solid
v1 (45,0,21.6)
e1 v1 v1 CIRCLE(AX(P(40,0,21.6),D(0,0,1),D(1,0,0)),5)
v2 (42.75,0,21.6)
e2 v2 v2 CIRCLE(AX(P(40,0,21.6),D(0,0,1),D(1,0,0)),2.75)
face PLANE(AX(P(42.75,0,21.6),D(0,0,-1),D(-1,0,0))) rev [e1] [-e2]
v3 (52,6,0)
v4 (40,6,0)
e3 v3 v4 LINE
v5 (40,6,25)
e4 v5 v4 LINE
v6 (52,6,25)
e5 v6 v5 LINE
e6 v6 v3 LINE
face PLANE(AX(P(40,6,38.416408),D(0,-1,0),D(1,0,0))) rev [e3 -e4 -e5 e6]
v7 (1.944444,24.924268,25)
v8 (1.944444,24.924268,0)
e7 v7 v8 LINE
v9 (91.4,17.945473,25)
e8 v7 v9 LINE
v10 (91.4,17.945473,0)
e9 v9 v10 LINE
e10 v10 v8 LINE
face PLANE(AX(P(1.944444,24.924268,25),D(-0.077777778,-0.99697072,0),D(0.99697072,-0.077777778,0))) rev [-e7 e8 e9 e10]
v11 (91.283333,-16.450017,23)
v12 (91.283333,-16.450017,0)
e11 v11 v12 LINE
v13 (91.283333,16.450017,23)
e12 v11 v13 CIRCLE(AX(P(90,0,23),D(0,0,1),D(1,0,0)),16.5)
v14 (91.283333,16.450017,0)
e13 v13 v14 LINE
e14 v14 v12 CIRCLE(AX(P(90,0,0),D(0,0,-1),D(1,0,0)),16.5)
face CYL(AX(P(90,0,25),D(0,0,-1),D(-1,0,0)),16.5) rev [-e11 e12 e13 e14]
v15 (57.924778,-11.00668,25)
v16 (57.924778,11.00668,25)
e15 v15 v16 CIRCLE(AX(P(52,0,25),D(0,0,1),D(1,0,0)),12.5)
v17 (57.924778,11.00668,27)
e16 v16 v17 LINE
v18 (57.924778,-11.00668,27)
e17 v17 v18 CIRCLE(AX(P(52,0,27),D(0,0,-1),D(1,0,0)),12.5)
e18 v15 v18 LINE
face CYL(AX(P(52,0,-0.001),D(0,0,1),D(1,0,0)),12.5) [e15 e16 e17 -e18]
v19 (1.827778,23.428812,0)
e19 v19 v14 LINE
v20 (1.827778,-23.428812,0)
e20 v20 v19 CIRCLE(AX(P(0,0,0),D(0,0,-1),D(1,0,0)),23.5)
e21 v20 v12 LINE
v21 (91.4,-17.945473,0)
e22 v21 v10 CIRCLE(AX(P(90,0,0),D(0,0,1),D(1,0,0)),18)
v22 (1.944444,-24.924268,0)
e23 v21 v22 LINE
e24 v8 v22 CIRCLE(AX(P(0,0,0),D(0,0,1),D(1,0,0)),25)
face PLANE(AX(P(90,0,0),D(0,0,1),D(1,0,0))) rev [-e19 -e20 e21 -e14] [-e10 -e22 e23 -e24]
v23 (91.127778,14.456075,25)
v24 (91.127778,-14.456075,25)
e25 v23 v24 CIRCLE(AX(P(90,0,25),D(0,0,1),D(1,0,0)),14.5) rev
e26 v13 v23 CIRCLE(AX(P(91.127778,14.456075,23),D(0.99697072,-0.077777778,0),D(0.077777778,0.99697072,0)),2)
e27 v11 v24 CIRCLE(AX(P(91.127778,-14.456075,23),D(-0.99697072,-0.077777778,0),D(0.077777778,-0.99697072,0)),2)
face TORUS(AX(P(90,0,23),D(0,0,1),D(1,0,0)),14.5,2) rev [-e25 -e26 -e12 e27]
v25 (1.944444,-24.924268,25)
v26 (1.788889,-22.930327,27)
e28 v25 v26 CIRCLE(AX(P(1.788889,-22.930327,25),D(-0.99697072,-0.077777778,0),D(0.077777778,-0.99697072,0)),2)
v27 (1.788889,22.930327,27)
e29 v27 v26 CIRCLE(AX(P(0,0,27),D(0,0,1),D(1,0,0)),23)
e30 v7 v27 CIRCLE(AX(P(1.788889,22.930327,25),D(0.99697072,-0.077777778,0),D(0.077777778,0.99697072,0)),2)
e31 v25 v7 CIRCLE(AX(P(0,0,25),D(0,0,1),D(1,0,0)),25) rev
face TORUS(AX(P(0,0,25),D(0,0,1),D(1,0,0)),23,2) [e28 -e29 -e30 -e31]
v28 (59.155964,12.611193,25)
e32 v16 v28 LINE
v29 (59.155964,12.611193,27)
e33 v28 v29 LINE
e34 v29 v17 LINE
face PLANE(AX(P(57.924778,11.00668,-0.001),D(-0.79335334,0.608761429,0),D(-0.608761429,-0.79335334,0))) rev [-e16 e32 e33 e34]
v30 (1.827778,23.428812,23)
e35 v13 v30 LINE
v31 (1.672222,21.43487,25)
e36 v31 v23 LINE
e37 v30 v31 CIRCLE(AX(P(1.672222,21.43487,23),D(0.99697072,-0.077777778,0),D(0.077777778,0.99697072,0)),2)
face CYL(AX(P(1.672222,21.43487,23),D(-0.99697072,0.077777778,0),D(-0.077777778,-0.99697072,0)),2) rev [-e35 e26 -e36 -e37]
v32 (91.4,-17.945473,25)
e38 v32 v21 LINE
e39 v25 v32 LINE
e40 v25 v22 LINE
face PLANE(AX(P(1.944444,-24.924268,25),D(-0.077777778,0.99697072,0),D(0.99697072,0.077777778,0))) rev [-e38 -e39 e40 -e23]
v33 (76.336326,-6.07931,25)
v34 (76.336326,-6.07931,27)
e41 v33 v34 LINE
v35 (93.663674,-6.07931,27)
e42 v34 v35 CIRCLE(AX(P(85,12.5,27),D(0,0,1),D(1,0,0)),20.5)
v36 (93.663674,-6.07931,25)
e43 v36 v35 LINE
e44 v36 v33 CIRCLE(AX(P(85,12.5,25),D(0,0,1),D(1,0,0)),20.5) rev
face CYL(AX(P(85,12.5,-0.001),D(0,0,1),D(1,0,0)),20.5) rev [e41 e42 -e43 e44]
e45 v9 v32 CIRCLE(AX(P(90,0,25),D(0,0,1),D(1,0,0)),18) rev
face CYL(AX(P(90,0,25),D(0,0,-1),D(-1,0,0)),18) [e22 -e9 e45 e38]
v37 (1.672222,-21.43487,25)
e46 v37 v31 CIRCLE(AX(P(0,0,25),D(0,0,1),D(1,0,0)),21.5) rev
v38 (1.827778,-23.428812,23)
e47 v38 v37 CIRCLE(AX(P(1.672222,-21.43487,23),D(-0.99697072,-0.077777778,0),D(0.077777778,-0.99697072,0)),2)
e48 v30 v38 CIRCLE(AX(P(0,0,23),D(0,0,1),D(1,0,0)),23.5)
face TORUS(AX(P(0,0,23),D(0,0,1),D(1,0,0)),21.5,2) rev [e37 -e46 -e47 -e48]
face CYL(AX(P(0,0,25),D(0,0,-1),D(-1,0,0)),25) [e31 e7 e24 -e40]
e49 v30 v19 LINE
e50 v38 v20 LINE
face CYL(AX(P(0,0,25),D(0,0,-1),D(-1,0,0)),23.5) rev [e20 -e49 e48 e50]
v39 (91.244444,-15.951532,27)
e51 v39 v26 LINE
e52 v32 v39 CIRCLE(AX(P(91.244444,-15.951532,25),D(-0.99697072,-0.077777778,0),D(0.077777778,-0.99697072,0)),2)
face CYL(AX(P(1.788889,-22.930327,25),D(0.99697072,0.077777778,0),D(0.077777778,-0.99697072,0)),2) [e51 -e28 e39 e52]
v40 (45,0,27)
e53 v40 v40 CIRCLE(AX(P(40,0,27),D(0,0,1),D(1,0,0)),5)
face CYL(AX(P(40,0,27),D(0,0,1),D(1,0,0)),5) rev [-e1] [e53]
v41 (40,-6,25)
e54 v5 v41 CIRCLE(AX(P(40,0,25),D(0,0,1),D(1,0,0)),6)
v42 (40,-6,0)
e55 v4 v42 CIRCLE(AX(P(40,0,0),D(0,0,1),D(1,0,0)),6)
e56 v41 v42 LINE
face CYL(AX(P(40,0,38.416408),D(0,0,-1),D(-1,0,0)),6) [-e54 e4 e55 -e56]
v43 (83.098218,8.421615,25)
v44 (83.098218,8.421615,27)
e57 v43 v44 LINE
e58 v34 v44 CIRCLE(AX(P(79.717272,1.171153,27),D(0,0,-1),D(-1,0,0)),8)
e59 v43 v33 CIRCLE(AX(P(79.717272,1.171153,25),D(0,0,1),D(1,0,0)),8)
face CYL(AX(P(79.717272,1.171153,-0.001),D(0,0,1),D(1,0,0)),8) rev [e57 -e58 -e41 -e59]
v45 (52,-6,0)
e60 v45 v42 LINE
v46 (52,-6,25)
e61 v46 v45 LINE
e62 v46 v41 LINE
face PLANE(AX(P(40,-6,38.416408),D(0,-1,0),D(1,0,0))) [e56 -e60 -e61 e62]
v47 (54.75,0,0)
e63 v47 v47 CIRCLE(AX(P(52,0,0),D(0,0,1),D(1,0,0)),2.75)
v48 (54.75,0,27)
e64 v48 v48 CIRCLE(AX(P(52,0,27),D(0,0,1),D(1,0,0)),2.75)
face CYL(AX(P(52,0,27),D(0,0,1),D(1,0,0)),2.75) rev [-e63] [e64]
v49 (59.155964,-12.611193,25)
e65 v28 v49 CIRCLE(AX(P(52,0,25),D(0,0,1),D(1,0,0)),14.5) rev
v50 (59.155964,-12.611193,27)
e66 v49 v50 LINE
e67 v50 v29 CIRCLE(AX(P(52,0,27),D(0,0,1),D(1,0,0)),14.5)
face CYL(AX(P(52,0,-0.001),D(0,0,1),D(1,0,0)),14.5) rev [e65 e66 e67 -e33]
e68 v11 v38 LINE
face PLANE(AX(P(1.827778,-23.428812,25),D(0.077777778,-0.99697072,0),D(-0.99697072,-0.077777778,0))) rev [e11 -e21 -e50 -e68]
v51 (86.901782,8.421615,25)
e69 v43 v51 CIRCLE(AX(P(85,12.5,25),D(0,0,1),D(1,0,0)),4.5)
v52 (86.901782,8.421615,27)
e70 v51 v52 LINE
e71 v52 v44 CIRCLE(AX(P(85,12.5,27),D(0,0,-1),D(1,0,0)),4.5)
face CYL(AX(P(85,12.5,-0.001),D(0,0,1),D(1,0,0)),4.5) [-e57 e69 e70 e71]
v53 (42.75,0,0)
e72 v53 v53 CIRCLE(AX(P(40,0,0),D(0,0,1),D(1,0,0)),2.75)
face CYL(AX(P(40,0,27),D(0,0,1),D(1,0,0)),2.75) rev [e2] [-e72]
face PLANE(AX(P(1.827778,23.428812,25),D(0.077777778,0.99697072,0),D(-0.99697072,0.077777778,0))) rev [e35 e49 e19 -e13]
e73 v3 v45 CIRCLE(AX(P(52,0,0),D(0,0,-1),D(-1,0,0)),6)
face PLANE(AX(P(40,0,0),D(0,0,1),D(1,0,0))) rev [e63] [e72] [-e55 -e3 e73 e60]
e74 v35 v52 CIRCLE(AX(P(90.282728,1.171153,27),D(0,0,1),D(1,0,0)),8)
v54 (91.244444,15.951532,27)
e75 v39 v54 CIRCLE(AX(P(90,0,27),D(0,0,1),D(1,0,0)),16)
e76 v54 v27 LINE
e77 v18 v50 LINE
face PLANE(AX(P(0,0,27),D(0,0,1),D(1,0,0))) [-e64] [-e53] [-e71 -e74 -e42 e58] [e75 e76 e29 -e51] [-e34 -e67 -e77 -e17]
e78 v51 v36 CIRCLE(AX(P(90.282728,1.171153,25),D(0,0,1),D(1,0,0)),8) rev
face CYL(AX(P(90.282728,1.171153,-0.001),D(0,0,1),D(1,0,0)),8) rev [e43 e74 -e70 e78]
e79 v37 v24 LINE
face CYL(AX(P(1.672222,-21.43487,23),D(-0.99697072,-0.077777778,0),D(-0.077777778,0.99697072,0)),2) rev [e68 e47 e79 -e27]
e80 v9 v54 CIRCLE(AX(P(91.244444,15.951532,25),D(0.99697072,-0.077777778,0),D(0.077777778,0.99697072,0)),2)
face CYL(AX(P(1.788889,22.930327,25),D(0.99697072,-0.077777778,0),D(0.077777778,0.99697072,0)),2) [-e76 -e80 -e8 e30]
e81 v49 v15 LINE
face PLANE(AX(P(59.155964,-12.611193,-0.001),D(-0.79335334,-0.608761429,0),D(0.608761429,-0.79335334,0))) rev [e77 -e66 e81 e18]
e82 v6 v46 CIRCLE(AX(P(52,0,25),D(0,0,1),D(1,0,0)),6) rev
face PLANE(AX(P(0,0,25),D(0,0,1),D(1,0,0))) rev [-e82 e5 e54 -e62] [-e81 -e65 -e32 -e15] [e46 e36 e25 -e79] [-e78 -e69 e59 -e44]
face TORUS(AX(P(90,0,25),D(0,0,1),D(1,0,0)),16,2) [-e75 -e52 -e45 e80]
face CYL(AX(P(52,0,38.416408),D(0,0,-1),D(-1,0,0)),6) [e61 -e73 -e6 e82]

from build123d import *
from build123d.topology import SkipClean

# Parameters (mm, degrees)
AUFSATZ_LINEAR_AUSTRAGEN1_DEPTH                      = 25
AUFSATZ_LINEAR_AUSTRAGEN2_DEPTH                      = 2
VERRUNDUNG1_R                                        = 2
SCHNITT_LINEAR_AUSTRAGEN1_REACH                      = 116.096
AUFSATZ_LINEAR_AUSTRAGEN3_DEPTH                      = 25
SPIEGELN2_DEPTH                                      = 25
STIRNSENKUNG_F_R_M5_ZYLINDERSCHRAUBE_MIT_D           = 5.5
STIRNSENKUNG_F_R_M5_ZYLINDERSCHRAUBE_MIT_CBORE_D     = 10
STIRNSENKUNG_F_R_M5_ZYLINDERSCHRAUBE_MIT_CBORE_DEPTH = 5.4
DURCHGANGSLOCH_F_R_M51_D                             = 5.5
SCHNITT_LINEAR_AUSTRAGEN2_REACH                      = 116.096


# Read off the part's stored shape, not the designer's step: Spiegeln2
with BuildPart() as part:
    # Skizze1 → Aufsatz-Linear austragen1 (new body)
    with BuildSketch(Plane.XY):
        with BuildLine():
            Line((1.944444444, 24.924268009), (91.4, 17.945472967))
            ThreePointArc((91.4, 17.945472967), (103.213629327, 12.222929272), (108, 0))
            Line((108, 0), (106.5, 0))
            ThreePointArc((106.5, 0), (102.11249355, 11.204351833), (91.283333333, 16.450016886))
            Line((91.283333333, 16.450016886), (1.827777778, 23.428811929))
            ThreePointArc((1.827777778, 23.428811929), (-15.957713217, 17.251127177), (-23.5, 0))
            Line((-23.5, 0), (-25, 0))
            ThreePointArc((-25, 0), (-16.976290656, 18.352262955), (1.944444444, 24.924268009))
        make_face()
    extrude(amount=AUFSATZ_LINEAR_AUSTRAGEN1_DEPTH)

    # Skizze2 → Aufsatz-Linear austragen2 (add)
    with BuildSketch(Plane.XY.offset(25)):
        with BuildLine():
            Line((108, 0), (-25, 0))
            ThreePointArc((-25, 0), (-16.976290656, 18.352262955), (1.944444444, 24.924268009))
            Line((1.944444444, 24.924268009), (91.4, 17.945472967))
            ThreePointArc((91.4, 17.945472967), (103.213629327, 12.222929272), (108, 0))
        make_face()
    extrude(amount=AUFSATZ_LINEAR_AUSTRAGEN2_DEPTH)

    # Verrundung1
    verrundung1_edges = [part.edges().sort_by_distance(p)[0] for p in [
        (-15.957713217, 17.251127177, 25),
        (46.555555556, 19.939414407, 25),
        (-16.976290656, 18.352262955, 27),
        (102.11249355, 11.204351833, 25),
        (103.213629327, 12.222929272, 27),
        (46.672222222, 21.434870488, 27),
    ]]
    fillet(verrundung1_edges, radius=VERRUNDUNG1_R)

    # Spiegeln1: part across plane


with BuildPart() as part_1:
    with SkipClean():  # the faces are left unmerged after this step: merging them gives an invalid solid
        add(part.part)
        add(part.part.mirror(Plane.ZX))

    # Skizze11 → Schnitt-Linear austragen1 (cut, up to next)
    with BuildSketch(Plane.XY.offset(27), mode=Mode.PRIVATE) as schnitt_linear_austragen1_sk1:
        with BuildLine():
            Line((85, 0), (85, 8))
            ThreePointArc((85, 8), (85.973978263, 8.106667968), (86.901782178, 8.421614958))
            ThreePointArc((86.901782178, 8.421614958), (97.533190568, 4.552098756), (93.663674366, -6.079309634))
            ThreePointArc((93.663674366, -6.079309634), (89.437012086, -7.514068146), (85, -8))
            Line((85, -8), (85, 0))
        make_face()
    schnitt_linear_austragen1_tool1 = extrude(schnitt_linear_austragen1_sk1.sketch, amount=-SCHNITT_LINEAR_AUSTRAGEN1_REACH, mode=Mode.PRIVATE) & part_1.part
    schnitt_linear_austragen1 = schnitt_linear_austragen1_tool1.solids().sort_by_distance((90.892741, 0.809501, 27))[0]
    add(schnitt_linear_austragen1, mode=Mode.SUBTRACT)

    # Spiegeln3: Schnitt-Linear austragen1 across plane
    with SkipClean():  # the faces are left unmerged after this step: merging them gives an invalid solid
        add(schnitt_linear_austragen1.mirror(Plane(origin=(85, 0, -0.001), x_dir=(0, 0, 1), z_dir=(-1, 0, 0))), mode=Mode.SUBTRACT)

    # Skizze3 → Aufsatz-Linear austragen3 (add)
    with SkipClean():  # the faces are left unmerged after this step: merging them gives an invalid solid
        with BuildSketch(Plane.XY):
            with BuildLine():
                Line((46, 6), (46, 0))
                Line((46, 0), (34, 0))
                ThreePointArc((34, 0), (35.757359313, 4.242640687), (40, 6))
                Line((40, 6), (46, 6))
            make_face()
        extrude(amount=AUFSATZ_LINEAR_AUSTRAGEN3_DEPTH)

    # Spiegeln2 outline → Spiegeln2 (add)
    with SkipClean():  # the faces are left unmerged after this step: merging them gives an invalid solid
        with BuildSketch(Plane.XY):
            with BuildLine():
                Line((52, 6), (46, 6))
                Line((46, 6), (46, 0))
                Line((46, 0), (34, 0))
                ThreePointArc((34, 0), (35.757359313, -4.242640687), (40, -6))
                Line((40, -6), (52, -6))
                ThreePointArc((52, -6), (58, 0), (52, 6))
            make_face()
        extrude(amount=SPIEGELN2_DEPTH)

    # Stirnsenkung für M5 Zylinderschraube mit Innensechskant2 (through all)
    with Locations(Plane.XY.offset(27)):
        with Locations((40, 0)):
            CounterBoreHole(STIRNSENKUNG_F_R_M5_ZYLINDERSCHRAUBE_MIT_D / 2, STIRNSENKUNG_F_R_M5_ZYLINDERSCHRAUBE_MIT_CBORE_D / 2, STIRNSENKUNG_F_R_M5_ZYLINDERSCHRAUBE_MIT_CBORE_DEPTH)

    # Durchgangsloch für M51 (through all)
    with Locations(Plane.XY.offset(27)):
        with Locations((52, 0)):
            Hole(DURCHGANGSLOCH_F_R_M51_D / 2)

    # Skizze12 → Schnitt-Linear austragen2 (cut, up to next)
    with BuildSketch(Plane.XY.offset(27), mode=Mode.PRIVATE) as schnitt_linear_austragen2_sk1:
        with BuildLine():
            Line((59.155963734, -12.611192768), (57.924777873, -11.006680115))
            ThreePointArc((57.924777873, -11.006680115), (64.5, 0), (57.924777873, 11.006680115))
            Line((57.924777873, 11.006680115), (59.155963734, 12.611192768))
            ThreePointArc((59.155963734, 12.611192768), (60.01066697, 12.086323457), (60.827040721, 11.503623434))
            ThreePointArc((60.827040721, 11.503623434), (66.5, 0), (60.827040721, -11.503623434))
            ThreePointArc((60.827040721, -11.503623434), (60.01066697, -12.086323457), (59.155963734, -12.611192768))
        make_face()
    schnitt_linear_austragen2_tool1 = extrude(schnitt_linear_austragen2_sk1.sketch, amount=-SCHNITT_LINEAR_AUSTRAGEN2_REACH, mode=Mode.PRIVATE) & part_1.part
    add(schnitt_linear_austragen2_tool1.solids().sort_by_distance((58.751722, -11.646761, 27))[0], mode=Mode.SUBTRACT)


solid = part_1.part
